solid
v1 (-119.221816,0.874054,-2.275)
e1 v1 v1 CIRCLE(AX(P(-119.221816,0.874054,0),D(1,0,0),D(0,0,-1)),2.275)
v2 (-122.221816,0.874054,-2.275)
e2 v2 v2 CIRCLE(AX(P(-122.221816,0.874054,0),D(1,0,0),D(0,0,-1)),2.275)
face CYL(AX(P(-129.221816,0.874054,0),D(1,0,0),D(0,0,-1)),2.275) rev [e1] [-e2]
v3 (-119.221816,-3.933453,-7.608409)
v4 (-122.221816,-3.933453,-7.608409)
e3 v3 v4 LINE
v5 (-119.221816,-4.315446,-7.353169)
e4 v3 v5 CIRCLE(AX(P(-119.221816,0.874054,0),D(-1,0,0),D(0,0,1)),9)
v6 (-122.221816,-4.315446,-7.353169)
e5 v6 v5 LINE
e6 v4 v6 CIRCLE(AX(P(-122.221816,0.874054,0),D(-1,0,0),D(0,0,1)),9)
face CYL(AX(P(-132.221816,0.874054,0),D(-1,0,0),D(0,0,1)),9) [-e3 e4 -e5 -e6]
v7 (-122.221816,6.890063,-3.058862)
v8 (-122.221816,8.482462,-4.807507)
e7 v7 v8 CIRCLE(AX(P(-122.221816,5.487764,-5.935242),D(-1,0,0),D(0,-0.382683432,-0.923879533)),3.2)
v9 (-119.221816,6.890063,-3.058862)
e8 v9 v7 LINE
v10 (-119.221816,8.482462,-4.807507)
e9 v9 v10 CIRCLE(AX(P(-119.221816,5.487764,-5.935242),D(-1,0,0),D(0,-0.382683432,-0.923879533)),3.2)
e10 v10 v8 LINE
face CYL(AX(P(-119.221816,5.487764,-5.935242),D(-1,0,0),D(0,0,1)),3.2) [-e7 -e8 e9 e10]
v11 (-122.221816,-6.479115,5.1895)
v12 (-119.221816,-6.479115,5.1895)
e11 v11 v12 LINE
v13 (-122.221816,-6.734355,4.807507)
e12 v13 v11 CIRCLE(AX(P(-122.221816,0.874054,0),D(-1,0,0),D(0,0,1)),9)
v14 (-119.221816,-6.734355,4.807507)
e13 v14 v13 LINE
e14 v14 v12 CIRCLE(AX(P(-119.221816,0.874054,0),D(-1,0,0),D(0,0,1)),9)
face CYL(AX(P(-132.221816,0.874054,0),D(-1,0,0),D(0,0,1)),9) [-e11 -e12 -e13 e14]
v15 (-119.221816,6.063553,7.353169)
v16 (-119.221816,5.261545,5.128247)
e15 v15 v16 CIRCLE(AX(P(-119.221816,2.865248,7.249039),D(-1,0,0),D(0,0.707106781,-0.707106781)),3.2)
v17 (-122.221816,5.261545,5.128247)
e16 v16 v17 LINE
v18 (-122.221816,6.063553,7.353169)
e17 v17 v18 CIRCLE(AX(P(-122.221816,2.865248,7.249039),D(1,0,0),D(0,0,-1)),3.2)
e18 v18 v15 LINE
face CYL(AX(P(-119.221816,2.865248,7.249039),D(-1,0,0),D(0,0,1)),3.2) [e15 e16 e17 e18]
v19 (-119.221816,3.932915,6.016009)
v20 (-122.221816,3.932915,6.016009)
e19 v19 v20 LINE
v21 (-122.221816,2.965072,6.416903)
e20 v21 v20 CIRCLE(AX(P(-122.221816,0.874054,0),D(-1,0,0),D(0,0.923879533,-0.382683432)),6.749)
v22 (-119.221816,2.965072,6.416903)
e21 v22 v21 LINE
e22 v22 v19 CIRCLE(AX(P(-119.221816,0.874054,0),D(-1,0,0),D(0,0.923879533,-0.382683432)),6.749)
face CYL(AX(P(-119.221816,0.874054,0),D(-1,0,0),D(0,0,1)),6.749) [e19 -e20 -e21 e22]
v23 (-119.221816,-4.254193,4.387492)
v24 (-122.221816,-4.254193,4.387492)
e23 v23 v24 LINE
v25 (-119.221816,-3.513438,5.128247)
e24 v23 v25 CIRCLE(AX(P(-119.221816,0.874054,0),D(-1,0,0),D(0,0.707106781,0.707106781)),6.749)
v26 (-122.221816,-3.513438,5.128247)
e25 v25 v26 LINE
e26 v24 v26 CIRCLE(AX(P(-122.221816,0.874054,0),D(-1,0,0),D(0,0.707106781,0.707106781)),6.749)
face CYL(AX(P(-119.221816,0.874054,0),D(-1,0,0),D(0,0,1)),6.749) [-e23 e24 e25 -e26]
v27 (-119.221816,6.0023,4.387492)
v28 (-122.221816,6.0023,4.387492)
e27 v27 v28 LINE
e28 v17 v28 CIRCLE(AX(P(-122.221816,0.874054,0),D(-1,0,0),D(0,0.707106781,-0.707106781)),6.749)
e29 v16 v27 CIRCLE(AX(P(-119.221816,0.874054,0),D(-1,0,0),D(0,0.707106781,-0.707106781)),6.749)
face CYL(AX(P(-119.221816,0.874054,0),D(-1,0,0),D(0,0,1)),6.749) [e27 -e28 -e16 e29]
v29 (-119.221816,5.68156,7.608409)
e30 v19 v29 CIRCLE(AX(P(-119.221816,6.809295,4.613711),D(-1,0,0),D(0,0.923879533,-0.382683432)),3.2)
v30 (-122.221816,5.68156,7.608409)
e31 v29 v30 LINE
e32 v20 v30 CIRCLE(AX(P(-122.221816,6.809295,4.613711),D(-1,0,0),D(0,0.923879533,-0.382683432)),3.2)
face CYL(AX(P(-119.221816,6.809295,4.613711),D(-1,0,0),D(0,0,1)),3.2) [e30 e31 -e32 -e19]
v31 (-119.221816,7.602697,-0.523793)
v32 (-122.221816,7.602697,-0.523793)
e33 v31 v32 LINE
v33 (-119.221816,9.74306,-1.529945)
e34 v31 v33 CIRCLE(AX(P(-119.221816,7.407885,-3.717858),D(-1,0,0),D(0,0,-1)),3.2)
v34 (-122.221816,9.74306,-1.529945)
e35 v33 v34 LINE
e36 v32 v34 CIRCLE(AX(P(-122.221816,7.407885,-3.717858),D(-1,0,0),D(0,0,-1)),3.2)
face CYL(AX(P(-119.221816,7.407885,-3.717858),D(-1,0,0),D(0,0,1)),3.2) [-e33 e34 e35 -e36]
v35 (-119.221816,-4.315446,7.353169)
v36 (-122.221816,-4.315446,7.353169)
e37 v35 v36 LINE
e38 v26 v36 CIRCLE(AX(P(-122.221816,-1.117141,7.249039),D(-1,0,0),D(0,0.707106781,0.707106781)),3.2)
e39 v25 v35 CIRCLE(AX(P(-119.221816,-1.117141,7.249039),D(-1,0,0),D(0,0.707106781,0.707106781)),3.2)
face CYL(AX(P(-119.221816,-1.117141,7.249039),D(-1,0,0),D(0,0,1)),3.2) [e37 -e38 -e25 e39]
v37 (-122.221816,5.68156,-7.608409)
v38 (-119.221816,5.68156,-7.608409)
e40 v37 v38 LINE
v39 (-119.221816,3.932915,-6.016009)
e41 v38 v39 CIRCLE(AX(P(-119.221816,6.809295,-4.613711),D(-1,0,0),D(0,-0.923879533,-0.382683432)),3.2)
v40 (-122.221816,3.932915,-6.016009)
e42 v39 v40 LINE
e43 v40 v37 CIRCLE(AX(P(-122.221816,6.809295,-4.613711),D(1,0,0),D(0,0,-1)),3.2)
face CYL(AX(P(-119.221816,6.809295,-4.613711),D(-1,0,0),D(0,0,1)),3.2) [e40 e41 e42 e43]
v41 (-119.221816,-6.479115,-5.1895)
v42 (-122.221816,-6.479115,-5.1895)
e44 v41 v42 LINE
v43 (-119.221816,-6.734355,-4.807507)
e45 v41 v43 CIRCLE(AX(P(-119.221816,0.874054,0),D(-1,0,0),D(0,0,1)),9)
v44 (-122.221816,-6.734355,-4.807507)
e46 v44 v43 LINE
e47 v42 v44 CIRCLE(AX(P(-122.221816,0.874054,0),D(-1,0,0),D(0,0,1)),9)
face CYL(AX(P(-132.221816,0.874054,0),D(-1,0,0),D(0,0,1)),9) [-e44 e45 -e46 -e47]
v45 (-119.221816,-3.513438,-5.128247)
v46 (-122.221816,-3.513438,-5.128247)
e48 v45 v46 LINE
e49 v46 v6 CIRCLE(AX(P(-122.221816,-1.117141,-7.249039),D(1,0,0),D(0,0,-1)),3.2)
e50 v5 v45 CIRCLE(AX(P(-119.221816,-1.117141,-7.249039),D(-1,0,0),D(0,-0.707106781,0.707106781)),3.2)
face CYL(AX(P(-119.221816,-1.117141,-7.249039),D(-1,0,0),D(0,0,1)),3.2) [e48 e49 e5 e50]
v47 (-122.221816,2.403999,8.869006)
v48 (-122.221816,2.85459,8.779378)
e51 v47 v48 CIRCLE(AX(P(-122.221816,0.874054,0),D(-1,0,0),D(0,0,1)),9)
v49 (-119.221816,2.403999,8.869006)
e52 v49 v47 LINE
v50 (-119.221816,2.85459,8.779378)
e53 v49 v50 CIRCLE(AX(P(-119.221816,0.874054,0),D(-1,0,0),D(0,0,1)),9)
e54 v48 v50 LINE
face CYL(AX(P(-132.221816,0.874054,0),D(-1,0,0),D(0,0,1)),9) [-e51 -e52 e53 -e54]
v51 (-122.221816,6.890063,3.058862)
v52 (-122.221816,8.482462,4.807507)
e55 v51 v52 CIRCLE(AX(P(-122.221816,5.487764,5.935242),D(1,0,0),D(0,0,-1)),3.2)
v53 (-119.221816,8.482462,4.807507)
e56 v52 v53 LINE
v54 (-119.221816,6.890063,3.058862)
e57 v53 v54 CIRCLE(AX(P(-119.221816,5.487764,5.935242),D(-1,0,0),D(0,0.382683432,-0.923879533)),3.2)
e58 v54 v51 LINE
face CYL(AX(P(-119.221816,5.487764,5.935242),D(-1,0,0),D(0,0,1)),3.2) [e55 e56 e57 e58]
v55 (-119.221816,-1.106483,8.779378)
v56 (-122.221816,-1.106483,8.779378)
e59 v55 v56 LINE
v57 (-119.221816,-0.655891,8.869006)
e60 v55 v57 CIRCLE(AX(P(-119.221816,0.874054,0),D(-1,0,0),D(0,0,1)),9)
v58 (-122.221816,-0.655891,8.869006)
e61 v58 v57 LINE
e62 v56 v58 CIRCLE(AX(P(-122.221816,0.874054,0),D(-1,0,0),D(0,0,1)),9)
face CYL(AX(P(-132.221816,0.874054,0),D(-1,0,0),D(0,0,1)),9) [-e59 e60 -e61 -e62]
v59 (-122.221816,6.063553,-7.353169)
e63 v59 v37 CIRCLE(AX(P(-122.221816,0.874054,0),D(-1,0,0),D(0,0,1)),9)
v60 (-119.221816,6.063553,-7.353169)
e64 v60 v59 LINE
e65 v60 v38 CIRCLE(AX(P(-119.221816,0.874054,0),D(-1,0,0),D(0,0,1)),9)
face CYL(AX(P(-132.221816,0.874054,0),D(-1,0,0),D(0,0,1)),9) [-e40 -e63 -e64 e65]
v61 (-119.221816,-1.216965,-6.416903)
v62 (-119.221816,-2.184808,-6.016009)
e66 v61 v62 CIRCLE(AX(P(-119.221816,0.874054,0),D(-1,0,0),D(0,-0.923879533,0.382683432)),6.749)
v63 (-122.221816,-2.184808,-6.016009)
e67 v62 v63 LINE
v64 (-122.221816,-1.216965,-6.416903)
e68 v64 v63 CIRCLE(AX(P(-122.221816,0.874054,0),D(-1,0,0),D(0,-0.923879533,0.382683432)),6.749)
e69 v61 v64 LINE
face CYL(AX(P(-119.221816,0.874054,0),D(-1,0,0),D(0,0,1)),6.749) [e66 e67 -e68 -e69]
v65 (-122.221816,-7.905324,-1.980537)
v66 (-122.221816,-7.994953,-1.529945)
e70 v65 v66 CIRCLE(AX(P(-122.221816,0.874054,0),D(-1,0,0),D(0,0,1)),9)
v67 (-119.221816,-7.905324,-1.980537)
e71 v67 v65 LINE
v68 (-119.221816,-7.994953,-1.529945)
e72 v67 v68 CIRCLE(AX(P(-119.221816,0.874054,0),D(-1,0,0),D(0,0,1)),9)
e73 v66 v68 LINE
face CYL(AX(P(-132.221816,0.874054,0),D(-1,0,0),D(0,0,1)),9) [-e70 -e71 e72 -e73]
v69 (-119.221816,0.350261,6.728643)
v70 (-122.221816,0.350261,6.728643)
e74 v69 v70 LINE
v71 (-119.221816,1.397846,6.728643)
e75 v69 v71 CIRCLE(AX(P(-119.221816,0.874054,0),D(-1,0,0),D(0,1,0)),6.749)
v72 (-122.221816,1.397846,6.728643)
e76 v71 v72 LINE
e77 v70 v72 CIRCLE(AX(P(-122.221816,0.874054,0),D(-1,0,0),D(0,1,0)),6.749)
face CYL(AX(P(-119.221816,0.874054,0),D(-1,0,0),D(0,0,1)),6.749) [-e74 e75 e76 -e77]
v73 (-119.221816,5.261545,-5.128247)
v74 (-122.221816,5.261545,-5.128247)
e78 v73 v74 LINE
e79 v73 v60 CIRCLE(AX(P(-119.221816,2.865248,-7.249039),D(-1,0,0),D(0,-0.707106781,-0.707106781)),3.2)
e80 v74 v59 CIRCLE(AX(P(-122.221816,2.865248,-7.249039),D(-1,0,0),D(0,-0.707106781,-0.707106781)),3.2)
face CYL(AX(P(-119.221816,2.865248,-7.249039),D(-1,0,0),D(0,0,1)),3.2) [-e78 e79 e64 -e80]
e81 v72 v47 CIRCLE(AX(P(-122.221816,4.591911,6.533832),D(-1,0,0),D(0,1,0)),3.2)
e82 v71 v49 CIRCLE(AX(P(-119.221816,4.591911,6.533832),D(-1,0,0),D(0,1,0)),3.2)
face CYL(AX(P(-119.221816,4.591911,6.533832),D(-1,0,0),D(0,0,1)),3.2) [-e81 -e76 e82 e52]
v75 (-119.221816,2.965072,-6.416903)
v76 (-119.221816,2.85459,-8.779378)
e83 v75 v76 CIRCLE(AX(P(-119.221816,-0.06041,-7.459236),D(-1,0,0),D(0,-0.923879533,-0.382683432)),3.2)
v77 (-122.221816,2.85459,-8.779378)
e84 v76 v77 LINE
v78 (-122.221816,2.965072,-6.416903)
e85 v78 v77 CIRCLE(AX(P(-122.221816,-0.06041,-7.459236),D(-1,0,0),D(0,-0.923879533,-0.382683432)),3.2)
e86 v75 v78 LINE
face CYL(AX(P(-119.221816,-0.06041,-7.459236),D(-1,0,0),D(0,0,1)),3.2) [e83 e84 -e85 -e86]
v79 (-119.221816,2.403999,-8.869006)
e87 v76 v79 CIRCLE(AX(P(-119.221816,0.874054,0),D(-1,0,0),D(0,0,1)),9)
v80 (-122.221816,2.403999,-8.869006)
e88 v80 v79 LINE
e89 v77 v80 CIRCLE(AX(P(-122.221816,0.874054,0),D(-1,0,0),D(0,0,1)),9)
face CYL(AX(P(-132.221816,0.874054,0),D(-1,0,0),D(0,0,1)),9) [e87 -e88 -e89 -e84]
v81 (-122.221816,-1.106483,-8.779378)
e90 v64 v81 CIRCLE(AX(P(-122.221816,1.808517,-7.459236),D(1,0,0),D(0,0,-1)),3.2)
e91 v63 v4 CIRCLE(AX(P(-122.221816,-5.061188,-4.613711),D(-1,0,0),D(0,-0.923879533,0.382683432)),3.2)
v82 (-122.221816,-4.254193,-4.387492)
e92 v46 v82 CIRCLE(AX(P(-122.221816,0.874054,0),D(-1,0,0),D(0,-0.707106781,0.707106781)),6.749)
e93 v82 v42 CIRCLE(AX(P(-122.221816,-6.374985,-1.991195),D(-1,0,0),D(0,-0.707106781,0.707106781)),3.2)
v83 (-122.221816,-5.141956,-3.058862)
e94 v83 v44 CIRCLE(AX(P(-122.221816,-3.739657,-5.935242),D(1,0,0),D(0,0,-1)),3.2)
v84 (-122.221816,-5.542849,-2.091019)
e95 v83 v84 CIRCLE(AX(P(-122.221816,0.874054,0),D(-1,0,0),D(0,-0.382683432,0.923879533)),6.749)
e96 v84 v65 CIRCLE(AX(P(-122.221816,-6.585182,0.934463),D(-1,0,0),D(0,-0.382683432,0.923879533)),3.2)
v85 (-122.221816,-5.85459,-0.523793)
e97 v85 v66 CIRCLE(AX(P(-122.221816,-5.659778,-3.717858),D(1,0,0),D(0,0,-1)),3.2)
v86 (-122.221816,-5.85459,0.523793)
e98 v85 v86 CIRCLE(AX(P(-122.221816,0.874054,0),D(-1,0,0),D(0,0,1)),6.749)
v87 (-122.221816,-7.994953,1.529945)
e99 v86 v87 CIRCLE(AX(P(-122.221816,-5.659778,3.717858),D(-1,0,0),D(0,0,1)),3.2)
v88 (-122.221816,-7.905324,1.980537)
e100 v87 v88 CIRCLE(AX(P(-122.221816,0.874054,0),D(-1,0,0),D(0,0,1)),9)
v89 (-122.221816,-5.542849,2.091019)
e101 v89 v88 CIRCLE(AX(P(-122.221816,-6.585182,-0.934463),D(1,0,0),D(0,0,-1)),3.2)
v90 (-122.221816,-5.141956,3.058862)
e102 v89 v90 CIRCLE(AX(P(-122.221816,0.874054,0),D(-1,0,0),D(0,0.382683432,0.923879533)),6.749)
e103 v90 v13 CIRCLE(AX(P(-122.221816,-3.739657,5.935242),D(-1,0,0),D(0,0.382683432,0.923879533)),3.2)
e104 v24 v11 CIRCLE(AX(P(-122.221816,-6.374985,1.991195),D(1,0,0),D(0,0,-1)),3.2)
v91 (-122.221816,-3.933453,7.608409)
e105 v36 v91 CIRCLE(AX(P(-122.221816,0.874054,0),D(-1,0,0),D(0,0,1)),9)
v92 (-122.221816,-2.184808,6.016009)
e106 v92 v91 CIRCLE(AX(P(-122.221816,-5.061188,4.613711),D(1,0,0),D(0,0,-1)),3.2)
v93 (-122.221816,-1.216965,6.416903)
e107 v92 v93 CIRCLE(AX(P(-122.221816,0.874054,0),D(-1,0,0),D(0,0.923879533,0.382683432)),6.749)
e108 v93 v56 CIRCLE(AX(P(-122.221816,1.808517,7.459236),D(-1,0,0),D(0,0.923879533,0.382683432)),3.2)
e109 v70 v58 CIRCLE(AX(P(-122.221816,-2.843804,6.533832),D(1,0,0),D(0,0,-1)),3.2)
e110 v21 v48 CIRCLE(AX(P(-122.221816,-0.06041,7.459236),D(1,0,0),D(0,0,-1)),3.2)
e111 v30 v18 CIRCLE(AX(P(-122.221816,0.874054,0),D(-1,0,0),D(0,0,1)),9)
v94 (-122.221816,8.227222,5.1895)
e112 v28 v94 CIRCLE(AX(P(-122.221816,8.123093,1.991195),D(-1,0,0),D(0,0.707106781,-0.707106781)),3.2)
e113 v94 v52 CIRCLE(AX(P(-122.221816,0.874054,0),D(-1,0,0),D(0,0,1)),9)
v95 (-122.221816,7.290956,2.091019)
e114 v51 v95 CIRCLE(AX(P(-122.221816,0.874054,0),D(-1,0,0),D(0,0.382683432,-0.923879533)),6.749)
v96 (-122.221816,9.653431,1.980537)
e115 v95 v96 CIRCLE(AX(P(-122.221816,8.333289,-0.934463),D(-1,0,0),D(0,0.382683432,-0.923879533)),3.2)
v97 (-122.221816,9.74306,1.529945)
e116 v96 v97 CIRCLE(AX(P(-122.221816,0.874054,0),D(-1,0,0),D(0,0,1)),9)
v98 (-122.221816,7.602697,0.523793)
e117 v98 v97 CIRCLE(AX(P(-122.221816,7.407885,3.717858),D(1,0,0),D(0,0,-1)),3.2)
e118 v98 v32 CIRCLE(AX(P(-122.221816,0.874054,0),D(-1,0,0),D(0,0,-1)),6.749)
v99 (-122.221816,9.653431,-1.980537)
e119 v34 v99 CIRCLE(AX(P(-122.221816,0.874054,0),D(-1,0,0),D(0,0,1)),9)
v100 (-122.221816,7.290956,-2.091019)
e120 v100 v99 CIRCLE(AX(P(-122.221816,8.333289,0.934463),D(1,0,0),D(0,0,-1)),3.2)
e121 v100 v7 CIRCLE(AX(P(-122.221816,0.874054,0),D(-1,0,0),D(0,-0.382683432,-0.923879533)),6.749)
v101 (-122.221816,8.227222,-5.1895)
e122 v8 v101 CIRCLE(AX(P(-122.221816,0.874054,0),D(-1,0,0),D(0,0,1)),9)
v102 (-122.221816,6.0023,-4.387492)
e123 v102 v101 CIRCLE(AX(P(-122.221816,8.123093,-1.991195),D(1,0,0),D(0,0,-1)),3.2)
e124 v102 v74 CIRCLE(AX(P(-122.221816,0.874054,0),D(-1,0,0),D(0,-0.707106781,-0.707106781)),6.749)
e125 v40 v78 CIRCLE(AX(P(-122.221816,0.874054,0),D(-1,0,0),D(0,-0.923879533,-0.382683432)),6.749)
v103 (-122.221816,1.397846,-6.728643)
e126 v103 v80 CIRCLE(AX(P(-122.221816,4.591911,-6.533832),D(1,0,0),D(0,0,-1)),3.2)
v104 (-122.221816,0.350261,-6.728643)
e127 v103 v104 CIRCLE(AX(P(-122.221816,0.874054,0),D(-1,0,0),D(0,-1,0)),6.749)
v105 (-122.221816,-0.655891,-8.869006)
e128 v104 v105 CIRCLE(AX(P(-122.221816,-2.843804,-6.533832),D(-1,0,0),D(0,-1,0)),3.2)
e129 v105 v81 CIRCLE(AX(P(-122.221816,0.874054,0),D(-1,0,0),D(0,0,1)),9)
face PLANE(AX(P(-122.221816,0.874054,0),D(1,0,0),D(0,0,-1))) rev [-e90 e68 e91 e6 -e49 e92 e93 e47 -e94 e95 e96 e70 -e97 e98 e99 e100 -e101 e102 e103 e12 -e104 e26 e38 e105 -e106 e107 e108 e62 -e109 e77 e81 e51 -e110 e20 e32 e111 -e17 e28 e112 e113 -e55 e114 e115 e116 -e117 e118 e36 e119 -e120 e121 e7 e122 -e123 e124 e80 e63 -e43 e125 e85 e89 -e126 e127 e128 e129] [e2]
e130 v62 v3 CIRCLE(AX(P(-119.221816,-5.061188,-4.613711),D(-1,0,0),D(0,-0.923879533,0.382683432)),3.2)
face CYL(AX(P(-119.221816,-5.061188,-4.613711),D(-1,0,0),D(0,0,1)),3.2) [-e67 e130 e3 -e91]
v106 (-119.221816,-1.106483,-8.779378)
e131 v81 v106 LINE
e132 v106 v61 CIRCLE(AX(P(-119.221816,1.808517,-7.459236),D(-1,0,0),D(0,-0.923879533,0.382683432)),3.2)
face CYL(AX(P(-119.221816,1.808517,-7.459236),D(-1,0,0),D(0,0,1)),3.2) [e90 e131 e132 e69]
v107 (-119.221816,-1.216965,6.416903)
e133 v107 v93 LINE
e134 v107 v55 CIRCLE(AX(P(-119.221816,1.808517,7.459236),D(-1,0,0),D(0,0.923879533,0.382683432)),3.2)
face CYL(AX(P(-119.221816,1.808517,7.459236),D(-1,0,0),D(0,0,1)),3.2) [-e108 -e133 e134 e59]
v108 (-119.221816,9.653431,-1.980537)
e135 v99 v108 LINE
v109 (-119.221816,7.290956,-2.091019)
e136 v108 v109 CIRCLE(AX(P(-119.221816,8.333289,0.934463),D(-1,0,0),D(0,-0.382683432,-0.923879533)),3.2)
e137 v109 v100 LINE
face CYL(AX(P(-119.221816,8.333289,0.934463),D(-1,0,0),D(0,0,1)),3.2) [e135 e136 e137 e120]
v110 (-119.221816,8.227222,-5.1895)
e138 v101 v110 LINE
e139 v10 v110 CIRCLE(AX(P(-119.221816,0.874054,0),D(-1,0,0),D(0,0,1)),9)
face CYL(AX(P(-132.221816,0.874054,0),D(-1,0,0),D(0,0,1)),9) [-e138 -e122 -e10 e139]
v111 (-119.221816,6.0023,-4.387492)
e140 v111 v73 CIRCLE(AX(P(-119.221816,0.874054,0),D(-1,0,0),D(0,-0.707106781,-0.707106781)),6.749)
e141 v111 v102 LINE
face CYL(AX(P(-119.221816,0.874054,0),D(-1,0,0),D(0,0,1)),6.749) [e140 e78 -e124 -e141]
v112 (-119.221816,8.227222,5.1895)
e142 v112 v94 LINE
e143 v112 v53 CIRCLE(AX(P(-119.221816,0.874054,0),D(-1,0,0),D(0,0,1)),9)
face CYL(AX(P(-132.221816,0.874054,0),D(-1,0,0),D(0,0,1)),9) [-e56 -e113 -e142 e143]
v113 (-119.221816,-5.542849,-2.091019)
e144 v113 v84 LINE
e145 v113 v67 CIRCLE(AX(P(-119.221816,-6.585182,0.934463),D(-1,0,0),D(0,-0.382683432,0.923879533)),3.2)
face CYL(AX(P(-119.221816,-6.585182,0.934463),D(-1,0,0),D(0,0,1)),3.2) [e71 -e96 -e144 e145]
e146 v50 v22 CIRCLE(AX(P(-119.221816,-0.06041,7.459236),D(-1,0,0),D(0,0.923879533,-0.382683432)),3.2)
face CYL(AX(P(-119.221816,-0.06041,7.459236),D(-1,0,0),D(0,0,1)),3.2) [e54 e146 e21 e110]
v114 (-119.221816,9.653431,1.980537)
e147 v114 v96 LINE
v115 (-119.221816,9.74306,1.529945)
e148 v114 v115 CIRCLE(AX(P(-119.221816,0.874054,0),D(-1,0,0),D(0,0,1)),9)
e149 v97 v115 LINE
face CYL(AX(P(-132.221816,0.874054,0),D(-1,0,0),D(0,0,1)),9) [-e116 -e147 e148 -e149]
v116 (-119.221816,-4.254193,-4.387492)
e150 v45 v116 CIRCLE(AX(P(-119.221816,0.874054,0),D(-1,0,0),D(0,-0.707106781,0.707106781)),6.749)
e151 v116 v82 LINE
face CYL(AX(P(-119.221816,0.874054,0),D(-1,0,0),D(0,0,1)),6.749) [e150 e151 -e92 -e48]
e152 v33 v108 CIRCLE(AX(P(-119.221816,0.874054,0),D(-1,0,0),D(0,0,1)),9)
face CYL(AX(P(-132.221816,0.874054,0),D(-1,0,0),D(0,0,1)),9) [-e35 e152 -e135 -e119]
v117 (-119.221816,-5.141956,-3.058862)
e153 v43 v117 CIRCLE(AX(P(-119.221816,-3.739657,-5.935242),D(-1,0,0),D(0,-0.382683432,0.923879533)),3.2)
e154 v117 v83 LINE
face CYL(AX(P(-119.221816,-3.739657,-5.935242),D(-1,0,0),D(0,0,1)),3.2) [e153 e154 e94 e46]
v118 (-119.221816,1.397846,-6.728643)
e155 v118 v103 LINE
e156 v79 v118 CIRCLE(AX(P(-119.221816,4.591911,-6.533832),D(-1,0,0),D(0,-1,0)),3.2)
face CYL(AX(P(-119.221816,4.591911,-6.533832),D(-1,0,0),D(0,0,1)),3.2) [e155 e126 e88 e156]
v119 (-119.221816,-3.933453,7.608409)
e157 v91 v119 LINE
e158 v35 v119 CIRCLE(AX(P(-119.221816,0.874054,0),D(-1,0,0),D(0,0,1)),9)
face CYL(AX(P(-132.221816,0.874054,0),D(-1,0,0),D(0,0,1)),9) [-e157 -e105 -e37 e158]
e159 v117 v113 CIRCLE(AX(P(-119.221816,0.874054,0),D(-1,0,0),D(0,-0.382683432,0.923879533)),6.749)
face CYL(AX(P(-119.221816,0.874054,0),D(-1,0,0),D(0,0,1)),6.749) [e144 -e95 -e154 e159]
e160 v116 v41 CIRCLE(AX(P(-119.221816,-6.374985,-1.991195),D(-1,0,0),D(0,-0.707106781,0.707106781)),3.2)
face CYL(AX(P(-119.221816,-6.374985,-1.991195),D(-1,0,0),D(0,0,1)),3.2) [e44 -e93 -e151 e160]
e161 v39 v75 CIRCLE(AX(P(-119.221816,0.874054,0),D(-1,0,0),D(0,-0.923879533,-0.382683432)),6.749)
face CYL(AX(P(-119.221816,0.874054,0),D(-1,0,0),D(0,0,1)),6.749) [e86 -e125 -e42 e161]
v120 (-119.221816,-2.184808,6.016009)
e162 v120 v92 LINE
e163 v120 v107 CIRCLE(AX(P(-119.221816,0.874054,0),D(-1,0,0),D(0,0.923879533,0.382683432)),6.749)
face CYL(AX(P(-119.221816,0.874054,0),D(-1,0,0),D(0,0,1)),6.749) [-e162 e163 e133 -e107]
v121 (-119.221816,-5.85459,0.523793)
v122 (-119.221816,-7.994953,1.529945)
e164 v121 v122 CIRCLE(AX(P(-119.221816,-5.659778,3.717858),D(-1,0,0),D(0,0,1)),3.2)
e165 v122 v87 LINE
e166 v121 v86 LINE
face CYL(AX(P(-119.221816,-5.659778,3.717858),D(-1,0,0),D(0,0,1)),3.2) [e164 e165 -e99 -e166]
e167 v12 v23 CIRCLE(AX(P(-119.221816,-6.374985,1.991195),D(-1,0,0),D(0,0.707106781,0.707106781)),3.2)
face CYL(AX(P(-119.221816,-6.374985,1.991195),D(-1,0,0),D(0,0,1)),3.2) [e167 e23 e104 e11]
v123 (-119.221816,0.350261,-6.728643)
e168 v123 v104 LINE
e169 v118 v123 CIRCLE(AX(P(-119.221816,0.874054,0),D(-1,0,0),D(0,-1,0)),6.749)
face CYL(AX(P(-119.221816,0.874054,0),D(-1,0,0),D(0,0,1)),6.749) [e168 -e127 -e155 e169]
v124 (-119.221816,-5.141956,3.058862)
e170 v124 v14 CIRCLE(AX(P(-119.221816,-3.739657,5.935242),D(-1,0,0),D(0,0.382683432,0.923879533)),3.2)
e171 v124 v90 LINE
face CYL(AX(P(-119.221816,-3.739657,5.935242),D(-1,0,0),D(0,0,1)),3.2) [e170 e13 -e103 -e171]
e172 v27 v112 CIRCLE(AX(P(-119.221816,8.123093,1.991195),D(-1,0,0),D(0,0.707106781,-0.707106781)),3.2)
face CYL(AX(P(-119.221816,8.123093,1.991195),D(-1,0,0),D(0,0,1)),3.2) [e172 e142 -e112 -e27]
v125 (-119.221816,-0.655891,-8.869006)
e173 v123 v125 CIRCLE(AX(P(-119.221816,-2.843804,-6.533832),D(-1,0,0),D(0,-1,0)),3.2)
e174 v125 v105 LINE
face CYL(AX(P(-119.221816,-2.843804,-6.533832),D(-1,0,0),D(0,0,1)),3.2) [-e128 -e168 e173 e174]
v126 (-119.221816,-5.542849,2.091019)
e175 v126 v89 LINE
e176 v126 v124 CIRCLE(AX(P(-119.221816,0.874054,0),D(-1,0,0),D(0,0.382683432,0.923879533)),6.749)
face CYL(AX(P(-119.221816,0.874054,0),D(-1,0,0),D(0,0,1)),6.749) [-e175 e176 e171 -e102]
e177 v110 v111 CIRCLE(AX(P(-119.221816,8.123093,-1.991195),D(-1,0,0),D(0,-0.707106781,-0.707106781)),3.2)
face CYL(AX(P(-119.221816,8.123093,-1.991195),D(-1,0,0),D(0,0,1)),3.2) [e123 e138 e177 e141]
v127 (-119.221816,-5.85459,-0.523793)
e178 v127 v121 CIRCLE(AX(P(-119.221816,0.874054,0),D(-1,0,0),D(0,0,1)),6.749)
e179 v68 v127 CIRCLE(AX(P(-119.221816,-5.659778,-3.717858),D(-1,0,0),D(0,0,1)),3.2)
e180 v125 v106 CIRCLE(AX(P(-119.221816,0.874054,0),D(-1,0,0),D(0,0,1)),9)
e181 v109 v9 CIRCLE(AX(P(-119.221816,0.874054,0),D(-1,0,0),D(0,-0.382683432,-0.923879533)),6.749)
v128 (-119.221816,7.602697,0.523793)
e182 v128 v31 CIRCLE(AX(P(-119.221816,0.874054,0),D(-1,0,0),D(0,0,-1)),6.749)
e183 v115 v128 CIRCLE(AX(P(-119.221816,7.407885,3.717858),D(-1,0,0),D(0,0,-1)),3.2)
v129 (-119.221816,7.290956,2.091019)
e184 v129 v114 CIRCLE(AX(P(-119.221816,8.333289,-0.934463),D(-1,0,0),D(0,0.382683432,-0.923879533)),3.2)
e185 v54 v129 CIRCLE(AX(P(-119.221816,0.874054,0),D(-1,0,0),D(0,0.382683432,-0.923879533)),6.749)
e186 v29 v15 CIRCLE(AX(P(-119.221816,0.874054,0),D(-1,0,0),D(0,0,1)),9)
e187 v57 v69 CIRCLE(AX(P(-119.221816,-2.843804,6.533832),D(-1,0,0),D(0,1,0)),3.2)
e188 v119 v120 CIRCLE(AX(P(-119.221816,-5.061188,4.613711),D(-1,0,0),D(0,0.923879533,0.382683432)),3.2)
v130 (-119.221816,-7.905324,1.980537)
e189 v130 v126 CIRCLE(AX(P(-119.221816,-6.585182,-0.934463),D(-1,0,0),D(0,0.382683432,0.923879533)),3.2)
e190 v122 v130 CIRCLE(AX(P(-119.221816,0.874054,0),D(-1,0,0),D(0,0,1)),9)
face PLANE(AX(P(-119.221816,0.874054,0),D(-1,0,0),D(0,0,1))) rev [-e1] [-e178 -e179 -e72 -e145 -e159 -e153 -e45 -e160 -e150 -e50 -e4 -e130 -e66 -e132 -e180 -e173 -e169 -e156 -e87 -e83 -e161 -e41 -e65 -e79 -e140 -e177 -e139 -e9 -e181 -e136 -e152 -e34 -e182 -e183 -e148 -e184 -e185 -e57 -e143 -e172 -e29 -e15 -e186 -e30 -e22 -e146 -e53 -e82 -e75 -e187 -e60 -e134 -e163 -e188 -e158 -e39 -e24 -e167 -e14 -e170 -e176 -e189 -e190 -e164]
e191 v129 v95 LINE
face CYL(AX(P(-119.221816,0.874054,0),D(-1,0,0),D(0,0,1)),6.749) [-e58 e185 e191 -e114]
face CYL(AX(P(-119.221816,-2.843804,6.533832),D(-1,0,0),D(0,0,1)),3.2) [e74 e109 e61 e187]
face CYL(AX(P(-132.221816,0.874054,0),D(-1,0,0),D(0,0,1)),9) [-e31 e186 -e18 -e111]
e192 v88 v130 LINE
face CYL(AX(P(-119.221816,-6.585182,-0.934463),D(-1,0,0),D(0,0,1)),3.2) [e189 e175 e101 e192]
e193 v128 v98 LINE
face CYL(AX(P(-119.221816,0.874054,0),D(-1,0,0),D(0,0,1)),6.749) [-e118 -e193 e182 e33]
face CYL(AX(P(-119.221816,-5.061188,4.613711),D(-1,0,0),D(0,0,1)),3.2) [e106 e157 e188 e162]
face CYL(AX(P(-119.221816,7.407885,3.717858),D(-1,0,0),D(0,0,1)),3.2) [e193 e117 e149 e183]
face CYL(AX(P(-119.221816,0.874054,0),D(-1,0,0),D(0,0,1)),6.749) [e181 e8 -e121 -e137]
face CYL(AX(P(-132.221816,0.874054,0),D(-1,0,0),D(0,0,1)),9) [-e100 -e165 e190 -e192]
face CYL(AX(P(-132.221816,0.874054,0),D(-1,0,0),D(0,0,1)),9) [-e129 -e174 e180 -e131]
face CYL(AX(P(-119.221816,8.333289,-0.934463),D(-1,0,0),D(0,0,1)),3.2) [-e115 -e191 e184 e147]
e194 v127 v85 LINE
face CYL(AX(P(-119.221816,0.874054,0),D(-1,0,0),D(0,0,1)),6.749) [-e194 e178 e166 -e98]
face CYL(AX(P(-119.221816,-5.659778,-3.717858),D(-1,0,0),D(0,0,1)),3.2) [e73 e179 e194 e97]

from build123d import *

# Parameters (mm, degrees)
SPUR_START              = -122.221816322
SPUR_GEAR_ISO_OUTLINE_R = 1
SPUR_GEAR_ISO_DEPTH     = 3
SKETCH1_R               = 2.275
CUT_EXTRUDE1_DEPTH      = 10


# Read off the part's stored shape, not the designer's step: spur gear_iso
with BuildPart() as part:
    # spur gear_iso outline → spur gear_iso (new body)
    with BuildSketch(Plane.YZ.offset(SPUR_START)):
        with BuildLine():
            ThreePointArc((2.854590328, 8.779377764), (2.629866412, 8.827067524), (2.403998504, 8.869006051))
            ThreePointArc((2.403998504, 8.869006051), (1.695929768, 7.895188691), (1.397846451, 6.728643397))
            ThreePointArc((1.397846451, 6.728643397), (0.874053513, 6.749), (0.350260576, 6.728643397))
            ThreePointArc((0.350260576, 6.728643397), (0.052177259, 7.895188691), (-0.655891477, 8.869006051))
            ThreePointArc((-0.655891477, 8.869006051), (-0.881759385, 8.827067524), (-1.106483301, 8.779377764))
            ThreePointArc((-1.106483301, 8.779377764), (-1.387989744, 7.608721662), (-1.216965263, 6.416902795))
            ThreePointArc((-1.216965263, 6.416902795), (-1.708676972, 6.235262965), (-2.184808411, 6.016009037))
            ThreePointArc((-2.184808411, 6.016009037), (-2.906619044, 6.97968481), (-3.933453026, 7.608408563))
            ThreePointArc((-3.933453026, 7.608408563), (-4.126078584, 7.483226511), (-4.315446329, 7.353168799))
            ThreePointArc((-4.315446329, 7.353168799), (-4.127533675, 6.163895735), (-3.513438322, 5.128246912))
            ThreePointArc((-3.513438322, 5.128246912), (-3.898210152, 4.772263666), (-4.254193398, 4.387491836))
            ThreePointArc((-4.254193398, 4.387491836), (-5.289842221, 5.001587189), (-6.479115285, 5.189499843))
            ThreePointArc((-6.479115285, 5.189499843), (-6.609172997, 5.000132097), (-6.73435505, 4.80750654))
            ThreePointArc((-6.73435505, 4.80750654), (-6.105631296, 3.780672557), (-5.141955523, 3.058861924))
            ThreePointArc((-5.141955523, 3.058861924), (-5.361209451, 2.582730485), (-5.542849281, 2.091018776))
            ThreePointArc((-5.542849281, 2.091018776), (-6.734668149, 2.262043257), (-7.905324251, 1.980536814))
            ThreePointArc((-7.905324251, 1.980536814), (-7.95301401, 1.755812898), (-7.994952537, 1.529944991))
            ThreePointArc((-7.994952537, 1.529944991), (-7.021135177, 0.821876255), (-5.854589883, 0.523792937))
            ThreePointArc((-5.854589883, 0.523792937), (-5.874946486, 0), (-5.854589883, -0.523792937))
            ThreePointArc((-5.854589883, -0.523792937), (-7.021135177, -0.821876255), (-7.994952537, -1.529944991))
            ThreePointArc((-7.994952537, -1.529944991), (-7.95301401, -1.755812898), (-7.905324251, -1.980536814))
            ThreePointArc((-7.905324251, -1.980536814), (-6.734668149, -2.262043257), (-5.542849281, -2.091018776))
            ThreePointArc((-5.542849281, -2.091018776), (-5.361209451, -2.582730485), (-5.141955523, -3.058861924))
            ThreePointArc((-5.141955523, -3.058861924), (-6.105631296, -3.780672557), (-6.73435505, -4.80750654))
            ThreePointArc((-6.73435505, -4.80750654), (-6.609172997, -5.000132097), (-6.479115285, -5.189499843))
            ThreePointArc((-6.479115285, -5.189499843), (-5.289842221, -5.001587189), (-4.254193398, -4.387491836))
            ThreePointArc((-4.254193398, -4.387491836), (-3.898210153, -4.772263667), (-3.513438322, -5.128246912))
            ThreePointArc((-3.513438322, -5.128246912), (-4.127533675, -6.163895735), (-4.315446329, -7.353168799))
            ThreePointArc((-4.315446329, -7.353168799), (-4.126078584, -7.483226511), (-3.933453026, -7.608408563))
            ThreePointArc((-3.933453026, -7.608408563), (-2.906619044, -6.97968481), (-2.184808411, -6.016009037))
            ThreePointArc((-2.184808411, -6.016009037), (-1.708676972, -6.235262965), (-1.216965263, -6.416902795))
            ThreePointArc((-1.216965263, -6.416902795), (-1.387989744, -7.608721662), (-1.106483301, -8.779377764))
            ThreePointArc((-1.106483301, -8.779377764), (-0.881759385, -8.827067524), (-0.655891477, -8.869006051))
            ThreePointArc((-0.655891477, -8.869006051), (0.052177259, -7.895188691), (0.350260576, -6.728643397))
            ThreePointArc((0.350260576, -6.728643397), (0.874053513, -6.749), (1.397846451, -6.728643397))
            ThreePointArc((1.397846451, -6.728643397), (1.695929768, -7.895188691), (2.403998504, -8.869006051))
            ThreePointArc((2.403998504, -8.869006051), (2.629866412, -8.827067524), (2.854590328, -8.779377764))
            ThreePointArc((2.854590328, -8.779377764), (3.136096771, -7.608721662), (2.96507229, -6.416902795))
            ThreePointArc((2.96507229, -6.416902795), (3.456783999, -6.235262965), (3.932915438, -6.016009037))
            ThreePointArc((3.932915438, -6.016009037), (4.654726071, -6.97968481), (5.681560054, -7.608408563))
            ThreePointArc((5.681560054, -7.608408563), (5.874185611, -7.483226511), (6.063553357, -7.353168799))
            ThreePointArc((6.063553357, -7.353168799), (5.875640702, -6.163895735), (5.26154535, -5.128246912))
            ThreePointArc((5.26154535, -5.128246912), (5.64631718, -4.772263666), (6.002300425, -4.387491836))
            ThreePointArc((6.002300425, -4.387491836), (7.037949248, -5.001587189), (8.227222312, -5.189499843))
            ThreePointArc((8.227222312, -5.189499843), (8.357280024, -5.000132097), (8.482462077, -4.80750654))
            ThreePointArc((8.482462077, -4.80750654), (7.853738324, -3.780672557), (6.89006255, -3.058861924))
            ThreePointArc((6.89006255, -3.058861924), (7.109316479, -2.582730485), (7.290956308, -2.091018776))
            ThreePointArc((7.290956308, -2.091018776), (8.482775176, -2.262043257), (9.653431278, -1.980536814))
            ThreePointArc((9.653431278, -1.980536814), (9.701121037, -1.755812898), (9.743059564, -1.529944991))
            ThreePointArc((9.743059564, -1.529944991), (8.769242204, -0.821876255), (7.60269691, -0.523792937))
            ThreePointArc((7.60269691, -0.523792937), (7.623053514, 0), (7.60269691, 0.523792937))
            ThreePointArc((7.60269691, 0.523792937), (8.769242204, 0.821876255), (9.743059564, 1.529944991))
            ThreePointArc((9.743059564, 1.529944991), (9.701121037, 1.755812898), (9.653431278, 1.980536814))
            ThreePointArc((9.653431278, 1.980536814), (8.482775176, 2.262043257), (7.290956308, 2.091018776))
            ThreePointArc((7.290956308, 2.091018776), (7.109316479, 2.582730485), (6.89006255, 3.058861924))
            ThreePointArc((6.89006255, 3.058861924), (7.853738324, 3.780672557), (8.482462077, 4.80750654))
            ThreePointArc((8.482462077, 4.80750654), (8.357280024, 5.000132097), (8.227222312, 5.189499843))
            ThreePointArc((8.227222312, 5.189499843), (7.037949248, 5.001587189), (6.002300425, 4.387491836))
            ThreePointArc((6.002300425, 4.387491836), (5.64631718, 4.772263666), (5.26154535, 5.128246912))
            ThreePointArc((5.26154535, 5.128246912), (5.875640702, 6.163895735), (6.063553357, 7.353168799))
            ThreePointArc((6.063553357, 7.353168799), (5.874185611, 7.483226511), (5.681560054, 7.608408563))
            ThreePointArc((5.681560054, 7.608408563), (4.654726071, 6.97968481), (3.932915438, 6.016009037))
            ThreePointArc((3.932915438, 6.016009037), (3.456783999, 6.235262965), (2.96507229, 6.416902795))
            ThreePointArc((2.96507229, 6.416902795), (3.136096771, 7.608721662), (2.854590328, 8.779377764))
        make_face()
        with Locations((0.874053514, 0)):
            Circle(SPUR_GEAR_ISO_OUTLINE_R, mode=Mode.SUBTRACT)
    extrude(amount=SPUR_GEAR_ISO_DEPTH)

    # Sketch1 → Cut-Extrude1 (cut)
    with BuildSketch(Plane(origin=(-119.221816322, 0, 0), x_dir=(0, 0, -1), z_dir=(1, 0, 0))):
        with Locations((0, 0.874053514)):
            Circle(SKETCH1_R)
    extrude(amount=-CUT_EXTRUDE1_DEPTH, mode=Mode.SUBTRACT)


solid = part.part
